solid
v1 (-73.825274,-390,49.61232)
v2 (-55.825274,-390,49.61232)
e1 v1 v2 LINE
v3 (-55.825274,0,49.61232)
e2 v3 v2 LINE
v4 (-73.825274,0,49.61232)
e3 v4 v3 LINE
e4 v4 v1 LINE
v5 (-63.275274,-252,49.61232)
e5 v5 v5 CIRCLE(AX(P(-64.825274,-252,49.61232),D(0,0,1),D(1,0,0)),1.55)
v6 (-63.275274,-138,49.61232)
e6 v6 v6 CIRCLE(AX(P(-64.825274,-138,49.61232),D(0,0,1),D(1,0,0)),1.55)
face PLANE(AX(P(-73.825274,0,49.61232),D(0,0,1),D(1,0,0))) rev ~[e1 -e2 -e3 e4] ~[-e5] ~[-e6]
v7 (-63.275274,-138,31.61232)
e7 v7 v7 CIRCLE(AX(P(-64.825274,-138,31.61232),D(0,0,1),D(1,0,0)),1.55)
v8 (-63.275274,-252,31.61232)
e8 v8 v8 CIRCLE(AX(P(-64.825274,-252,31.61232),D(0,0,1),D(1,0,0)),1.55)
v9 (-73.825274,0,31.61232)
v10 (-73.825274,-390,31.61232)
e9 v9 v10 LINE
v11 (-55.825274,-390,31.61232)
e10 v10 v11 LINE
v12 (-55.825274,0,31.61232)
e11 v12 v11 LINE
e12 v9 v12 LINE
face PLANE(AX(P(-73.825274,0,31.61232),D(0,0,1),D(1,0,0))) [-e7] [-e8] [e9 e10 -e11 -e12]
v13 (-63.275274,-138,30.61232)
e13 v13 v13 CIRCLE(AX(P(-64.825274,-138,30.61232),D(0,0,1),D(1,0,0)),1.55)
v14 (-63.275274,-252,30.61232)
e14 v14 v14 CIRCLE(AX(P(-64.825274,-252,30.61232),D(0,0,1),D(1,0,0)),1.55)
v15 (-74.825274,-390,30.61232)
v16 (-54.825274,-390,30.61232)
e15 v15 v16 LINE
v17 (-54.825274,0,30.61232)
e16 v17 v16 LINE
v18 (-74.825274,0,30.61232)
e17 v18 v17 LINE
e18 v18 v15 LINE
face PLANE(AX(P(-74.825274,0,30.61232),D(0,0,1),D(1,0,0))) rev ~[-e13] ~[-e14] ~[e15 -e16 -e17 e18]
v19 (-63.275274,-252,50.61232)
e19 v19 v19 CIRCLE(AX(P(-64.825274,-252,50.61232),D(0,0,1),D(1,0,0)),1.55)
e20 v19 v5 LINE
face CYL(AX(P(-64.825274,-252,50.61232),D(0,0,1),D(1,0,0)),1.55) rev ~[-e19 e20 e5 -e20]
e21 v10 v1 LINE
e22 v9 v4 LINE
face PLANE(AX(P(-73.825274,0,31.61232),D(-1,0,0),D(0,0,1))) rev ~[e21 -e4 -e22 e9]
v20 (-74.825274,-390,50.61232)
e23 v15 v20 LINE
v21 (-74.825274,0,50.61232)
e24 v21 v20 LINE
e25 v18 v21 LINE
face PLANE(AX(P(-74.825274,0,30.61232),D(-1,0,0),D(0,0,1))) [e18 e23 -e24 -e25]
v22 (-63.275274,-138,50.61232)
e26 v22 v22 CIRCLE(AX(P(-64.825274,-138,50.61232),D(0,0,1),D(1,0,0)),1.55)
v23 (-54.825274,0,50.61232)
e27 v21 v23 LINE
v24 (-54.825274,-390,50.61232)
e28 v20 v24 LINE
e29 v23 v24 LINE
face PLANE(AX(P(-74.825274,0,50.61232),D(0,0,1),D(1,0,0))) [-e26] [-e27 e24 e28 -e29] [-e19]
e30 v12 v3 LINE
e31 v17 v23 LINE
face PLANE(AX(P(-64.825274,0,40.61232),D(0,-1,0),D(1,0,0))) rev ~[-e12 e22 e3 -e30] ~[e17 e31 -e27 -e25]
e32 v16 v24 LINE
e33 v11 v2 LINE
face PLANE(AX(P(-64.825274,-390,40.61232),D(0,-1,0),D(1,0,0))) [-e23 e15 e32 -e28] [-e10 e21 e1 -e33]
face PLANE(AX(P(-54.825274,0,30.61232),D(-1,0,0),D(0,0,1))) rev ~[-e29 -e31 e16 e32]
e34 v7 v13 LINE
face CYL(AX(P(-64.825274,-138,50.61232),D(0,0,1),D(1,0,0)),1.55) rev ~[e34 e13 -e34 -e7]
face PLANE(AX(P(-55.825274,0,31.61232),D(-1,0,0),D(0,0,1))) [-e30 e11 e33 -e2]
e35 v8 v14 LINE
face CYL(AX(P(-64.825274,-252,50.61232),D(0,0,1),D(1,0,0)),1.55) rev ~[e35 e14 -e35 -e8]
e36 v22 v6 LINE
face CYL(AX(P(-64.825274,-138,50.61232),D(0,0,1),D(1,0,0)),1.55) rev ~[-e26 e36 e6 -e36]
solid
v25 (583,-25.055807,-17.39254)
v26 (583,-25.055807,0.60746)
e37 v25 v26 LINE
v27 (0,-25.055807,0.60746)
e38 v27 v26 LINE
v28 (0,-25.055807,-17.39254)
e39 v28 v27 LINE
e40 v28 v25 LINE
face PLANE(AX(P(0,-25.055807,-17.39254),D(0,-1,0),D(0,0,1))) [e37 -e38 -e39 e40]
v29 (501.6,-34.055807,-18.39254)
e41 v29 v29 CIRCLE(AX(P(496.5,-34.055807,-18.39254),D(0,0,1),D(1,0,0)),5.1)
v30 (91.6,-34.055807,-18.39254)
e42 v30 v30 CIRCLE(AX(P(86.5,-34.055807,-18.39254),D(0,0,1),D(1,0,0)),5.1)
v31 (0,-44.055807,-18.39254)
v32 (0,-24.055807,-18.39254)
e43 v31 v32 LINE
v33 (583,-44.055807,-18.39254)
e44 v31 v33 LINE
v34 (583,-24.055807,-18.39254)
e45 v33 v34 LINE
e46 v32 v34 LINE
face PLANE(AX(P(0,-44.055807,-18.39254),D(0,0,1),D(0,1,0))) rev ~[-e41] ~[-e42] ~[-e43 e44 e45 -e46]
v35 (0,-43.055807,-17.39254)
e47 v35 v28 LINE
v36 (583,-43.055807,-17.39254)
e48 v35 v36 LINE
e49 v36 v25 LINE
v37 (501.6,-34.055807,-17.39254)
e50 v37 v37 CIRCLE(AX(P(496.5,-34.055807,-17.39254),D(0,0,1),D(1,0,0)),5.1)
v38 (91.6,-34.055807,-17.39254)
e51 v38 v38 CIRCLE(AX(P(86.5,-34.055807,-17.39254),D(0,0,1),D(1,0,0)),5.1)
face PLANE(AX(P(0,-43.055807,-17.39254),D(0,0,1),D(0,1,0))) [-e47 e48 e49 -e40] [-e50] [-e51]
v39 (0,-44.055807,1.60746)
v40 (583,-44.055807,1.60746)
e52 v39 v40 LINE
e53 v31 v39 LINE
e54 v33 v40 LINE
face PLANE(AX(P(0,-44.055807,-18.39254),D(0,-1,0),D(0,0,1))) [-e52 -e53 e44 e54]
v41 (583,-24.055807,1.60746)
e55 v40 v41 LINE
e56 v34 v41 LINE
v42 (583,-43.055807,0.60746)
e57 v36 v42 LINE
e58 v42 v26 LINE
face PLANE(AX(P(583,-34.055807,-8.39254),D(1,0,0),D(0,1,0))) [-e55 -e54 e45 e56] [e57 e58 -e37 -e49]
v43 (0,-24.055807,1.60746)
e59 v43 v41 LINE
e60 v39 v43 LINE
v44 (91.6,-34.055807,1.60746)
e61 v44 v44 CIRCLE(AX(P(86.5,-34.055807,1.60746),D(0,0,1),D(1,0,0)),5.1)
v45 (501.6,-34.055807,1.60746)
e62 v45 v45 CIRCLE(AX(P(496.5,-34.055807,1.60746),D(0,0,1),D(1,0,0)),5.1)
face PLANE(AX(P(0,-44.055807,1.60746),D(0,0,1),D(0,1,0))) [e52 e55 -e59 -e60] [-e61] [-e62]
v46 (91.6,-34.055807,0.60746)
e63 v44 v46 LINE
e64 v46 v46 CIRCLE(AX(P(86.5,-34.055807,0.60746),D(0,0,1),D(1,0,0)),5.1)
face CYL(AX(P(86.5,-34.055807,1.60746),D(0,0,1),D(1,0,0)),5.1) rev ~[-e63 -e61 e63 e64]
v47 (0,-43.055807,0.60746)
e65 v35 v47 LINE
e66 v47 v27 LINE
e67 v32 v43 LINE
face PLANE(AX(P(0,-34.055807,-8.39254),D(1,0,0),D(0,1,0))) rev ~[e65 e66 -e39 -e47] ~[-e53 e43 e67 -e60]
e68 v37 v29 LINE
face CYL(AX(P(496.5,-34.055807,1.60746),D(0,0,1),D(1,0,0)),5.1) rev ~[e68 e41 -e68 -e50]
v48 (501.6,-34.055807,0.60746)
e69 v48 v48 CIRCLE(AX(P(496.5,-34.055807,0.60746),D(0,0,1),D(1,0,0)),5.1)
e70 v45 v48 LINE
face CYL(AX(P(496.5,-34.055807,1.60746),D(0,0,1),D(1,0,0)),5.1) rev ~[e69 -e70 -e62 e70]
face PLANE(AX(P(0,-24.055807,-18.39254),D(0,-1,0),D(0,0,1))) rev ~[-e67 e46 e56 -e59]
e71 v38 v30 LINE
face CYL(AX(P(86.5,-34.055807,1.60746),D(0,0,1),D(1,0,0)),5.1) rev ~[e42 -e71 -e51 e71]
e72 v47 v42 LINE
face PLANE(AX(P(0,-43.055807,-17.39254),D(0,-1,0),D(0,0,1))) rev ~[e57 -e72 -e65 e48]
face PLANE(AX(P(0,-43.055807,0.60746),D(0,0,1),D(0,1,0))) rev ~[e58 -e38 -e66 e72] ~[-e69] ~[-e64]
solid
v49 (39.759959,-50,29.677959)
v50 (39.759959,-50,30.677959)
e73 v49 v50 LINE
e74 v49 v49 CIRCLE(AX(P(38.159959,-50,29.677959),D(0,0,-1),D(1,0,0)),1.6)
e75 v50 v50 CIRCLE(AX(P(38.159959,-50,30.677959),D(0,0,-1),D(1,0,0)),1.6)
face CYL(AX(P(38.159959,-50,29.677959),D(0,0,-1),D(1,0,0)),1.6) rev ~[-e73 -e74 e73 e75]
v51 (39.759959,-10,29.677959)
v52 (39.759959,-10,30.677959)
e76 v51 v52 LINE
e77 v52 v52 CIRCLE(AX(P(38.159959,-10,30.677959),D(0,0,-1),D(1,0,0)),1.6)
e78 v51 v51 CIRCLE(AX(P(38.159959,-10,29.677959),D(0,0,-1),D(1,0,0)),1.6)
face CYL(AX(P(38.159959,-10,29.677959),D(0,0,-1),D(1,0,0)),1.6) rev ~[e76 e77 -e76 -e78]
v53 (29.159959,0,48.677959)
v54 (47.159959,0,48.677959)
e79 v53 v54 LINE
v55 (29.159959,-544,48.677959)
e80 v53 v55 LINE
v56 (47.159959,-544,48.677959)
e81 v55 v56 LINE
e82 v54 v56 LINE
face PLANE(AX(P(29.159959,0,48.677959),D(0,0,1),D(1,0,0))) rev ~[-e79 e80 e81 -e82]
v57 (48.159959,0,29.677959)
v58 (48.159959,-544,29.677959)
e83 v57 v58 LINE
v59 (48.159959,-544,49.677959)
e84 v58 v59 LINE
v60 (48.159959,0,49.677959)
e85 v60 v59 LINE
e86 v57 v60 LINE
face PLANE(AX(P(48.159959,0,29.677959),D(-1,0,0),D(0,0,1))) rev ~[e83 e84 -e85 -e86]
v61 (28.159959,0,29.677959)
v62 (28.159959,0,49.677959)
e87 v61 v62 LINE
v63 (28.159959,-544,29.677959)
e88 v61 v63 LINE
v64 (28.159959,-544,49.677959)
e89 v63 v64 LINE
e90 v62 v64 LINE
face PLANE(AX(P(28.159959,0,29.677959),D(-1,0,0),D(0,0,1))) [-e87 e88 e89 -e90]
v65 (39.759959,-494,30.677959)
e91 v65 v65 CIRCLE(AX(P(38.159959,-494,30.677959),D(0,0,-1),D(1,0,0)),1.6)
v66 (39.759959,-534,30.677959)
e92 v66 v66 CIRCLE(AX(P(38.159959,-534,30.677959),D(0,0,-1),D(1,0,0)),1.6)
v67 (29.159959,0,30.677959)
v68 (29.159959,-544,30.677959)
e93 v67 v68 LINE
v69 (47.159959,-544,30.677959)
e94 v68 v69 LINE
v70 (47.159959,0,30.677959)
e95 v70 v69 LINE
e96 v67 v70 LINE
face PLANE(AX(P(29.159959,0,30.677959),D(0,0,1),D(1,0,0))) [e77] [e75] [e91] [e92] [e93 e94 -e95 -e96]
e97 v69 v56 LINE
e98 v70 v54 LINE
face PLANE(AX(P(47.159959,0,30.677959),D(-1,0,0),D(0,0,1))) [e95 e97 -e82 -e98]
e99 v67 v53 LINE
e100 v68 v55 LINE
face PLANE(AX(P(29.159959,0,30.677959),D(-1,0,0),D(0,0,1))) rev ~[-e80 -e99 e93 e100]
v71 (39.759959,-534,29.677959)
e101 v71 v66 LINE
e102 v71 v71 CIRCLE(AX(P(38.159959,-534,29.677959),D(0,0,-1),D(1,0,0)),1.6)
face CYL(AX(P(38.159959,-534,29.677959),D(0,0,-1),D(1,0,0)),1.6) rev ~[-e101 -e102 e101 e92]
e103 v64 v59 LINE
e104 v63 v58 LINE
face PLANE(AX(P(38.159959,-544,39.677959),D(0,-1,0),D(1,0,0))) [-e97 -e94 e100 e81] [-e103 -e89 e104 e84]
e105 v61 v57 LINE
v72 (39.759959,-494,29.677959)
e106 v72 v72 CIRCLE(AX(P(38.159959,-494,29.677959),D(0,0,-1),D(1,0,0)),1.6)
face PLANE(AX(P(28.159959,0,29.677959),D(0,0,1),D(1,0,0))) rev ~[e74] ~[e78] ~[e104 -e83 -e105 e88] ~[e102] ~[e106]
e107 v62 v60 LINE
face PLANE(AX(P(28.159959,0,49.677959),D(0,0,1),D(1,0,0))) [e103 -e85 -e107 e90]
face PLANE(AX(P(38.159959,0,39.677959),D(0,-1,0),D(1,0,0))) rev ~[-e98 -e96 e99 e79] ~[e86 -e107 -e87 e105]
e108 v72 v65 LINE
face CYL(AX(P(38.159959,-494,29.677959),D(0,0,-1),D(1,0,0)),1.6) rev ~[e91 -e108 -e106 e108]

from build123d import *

# Parameters (mm, degrees)
F0_W      = 20
F0_H      = 20
F0_W_2    = 18
F0_H_2    = 18
F1_DEPTH  = 390
F2_R      = 1.55
F3_DEPTH  = 20
F4_W      = 20
F4_H      = 20
F4_W_2    = 18
F4_H_2    = 18
F5_DEPTH  = 583
F6_R      = 5.1
F7_DEPTH  = 20.001
F8_W      = 20
F8_H      = 20
F8_W_2    = 18
F8_H_2    = 18
F9_DEPTH  = 544
F10_R     = 1.6
F11_DEPTH = 1


# Not quite as in the source:
# - a feature names something its author has since deleted; it is built from what else it names


with BuildPart() as f1:
    # F0 (on Front) → F1 (new body)
    with BuildSketch(Plane.XZ):
        with Locations((-64.8252740502, 40.6123196004)):
            Rectangle(F0_W, F0_H)
        with Locations((-64.8252740502, 40.6123196004)):
            Rectangle(F0_W_2, F0_H_2, mode=Mode.SUBTRACT)
    extrude(amount=F1_DEPTH)

    # F2 (on face) → F3 (cut, through all)
    with BuildSketch(Plane.XY.offset(50.6123196004)):
        with Locations((-64.8252740502, -138)):
            Circle(F2_R)
        with Locations((-64.8252740502, -252)):
            Circle(F2_R)
    extrude(amount=-F3_DEPTH, mode=Mode.SUBTRACT)


with BuildPart() as f5:
    # F4 (on Right) → F5 (new body)
    with BuildSketch(Plane.YZ):
        with Locations((-34.0558066964, -8.3925398067)):
            Rectangle(F4_W, F4_H)
        with Locations((-34.0558066964, -8.3925398067)):
            Rectangle(F4_W_2, F4_H_2, mode=Mode.SUBTRACT)
    extrude(amount=F5_DEPTH)

    # F6 (on face) → F7 (cut, through all)
    with BuildSketch(Plane.XY.offset(1.6074601933)):
        with Locations((86.5, -34.0558066964)):
            Circle(F6_R)
        with Locations((496.5, -34.0558066964)):
            Circle(F6_R)
    extrude(amount=-F7_DEPTH, mode=Mode.SUBTRACT)


with BuildPart() as f9:
    # F8 (on Front) → F9 (new body)
    with BuildSketch(Plane.XZ):
        with Locations((38.1599590182, 39.6779589355)):
            Rectangle(F8_W, F8_H)
        with Locations((38.1599590182, 39.6779589355)):
            Rectangle(F8_W_2, F8_H_2, mode=Mode.SUBTRACT)
    extrude(amount=F9_DEPTH)

    # F10 (on face) → F11 (cut, through all)
    with BuildSketch(Plane(origin=(0, 0, 29.6779589355), x_dir=(1, 0, 0), z_dir=(0, 0, -1))):
        with Locations((38.1599590182, 10)):
            Circle(F10_R)
        with Locations((38.1599590182, 50)):
            Circle(F10_R)
        with Locations((38.1599590182, 494)):
            Circle(F10_R)
        with Locations((38.1599590182, 534)):
            Circle(F10_R)
    extrude(amount=-F11_DEPTH, mode=Mode.SUBTRACT)


solid = Compound([f1.part, f5.part, f9.part])
